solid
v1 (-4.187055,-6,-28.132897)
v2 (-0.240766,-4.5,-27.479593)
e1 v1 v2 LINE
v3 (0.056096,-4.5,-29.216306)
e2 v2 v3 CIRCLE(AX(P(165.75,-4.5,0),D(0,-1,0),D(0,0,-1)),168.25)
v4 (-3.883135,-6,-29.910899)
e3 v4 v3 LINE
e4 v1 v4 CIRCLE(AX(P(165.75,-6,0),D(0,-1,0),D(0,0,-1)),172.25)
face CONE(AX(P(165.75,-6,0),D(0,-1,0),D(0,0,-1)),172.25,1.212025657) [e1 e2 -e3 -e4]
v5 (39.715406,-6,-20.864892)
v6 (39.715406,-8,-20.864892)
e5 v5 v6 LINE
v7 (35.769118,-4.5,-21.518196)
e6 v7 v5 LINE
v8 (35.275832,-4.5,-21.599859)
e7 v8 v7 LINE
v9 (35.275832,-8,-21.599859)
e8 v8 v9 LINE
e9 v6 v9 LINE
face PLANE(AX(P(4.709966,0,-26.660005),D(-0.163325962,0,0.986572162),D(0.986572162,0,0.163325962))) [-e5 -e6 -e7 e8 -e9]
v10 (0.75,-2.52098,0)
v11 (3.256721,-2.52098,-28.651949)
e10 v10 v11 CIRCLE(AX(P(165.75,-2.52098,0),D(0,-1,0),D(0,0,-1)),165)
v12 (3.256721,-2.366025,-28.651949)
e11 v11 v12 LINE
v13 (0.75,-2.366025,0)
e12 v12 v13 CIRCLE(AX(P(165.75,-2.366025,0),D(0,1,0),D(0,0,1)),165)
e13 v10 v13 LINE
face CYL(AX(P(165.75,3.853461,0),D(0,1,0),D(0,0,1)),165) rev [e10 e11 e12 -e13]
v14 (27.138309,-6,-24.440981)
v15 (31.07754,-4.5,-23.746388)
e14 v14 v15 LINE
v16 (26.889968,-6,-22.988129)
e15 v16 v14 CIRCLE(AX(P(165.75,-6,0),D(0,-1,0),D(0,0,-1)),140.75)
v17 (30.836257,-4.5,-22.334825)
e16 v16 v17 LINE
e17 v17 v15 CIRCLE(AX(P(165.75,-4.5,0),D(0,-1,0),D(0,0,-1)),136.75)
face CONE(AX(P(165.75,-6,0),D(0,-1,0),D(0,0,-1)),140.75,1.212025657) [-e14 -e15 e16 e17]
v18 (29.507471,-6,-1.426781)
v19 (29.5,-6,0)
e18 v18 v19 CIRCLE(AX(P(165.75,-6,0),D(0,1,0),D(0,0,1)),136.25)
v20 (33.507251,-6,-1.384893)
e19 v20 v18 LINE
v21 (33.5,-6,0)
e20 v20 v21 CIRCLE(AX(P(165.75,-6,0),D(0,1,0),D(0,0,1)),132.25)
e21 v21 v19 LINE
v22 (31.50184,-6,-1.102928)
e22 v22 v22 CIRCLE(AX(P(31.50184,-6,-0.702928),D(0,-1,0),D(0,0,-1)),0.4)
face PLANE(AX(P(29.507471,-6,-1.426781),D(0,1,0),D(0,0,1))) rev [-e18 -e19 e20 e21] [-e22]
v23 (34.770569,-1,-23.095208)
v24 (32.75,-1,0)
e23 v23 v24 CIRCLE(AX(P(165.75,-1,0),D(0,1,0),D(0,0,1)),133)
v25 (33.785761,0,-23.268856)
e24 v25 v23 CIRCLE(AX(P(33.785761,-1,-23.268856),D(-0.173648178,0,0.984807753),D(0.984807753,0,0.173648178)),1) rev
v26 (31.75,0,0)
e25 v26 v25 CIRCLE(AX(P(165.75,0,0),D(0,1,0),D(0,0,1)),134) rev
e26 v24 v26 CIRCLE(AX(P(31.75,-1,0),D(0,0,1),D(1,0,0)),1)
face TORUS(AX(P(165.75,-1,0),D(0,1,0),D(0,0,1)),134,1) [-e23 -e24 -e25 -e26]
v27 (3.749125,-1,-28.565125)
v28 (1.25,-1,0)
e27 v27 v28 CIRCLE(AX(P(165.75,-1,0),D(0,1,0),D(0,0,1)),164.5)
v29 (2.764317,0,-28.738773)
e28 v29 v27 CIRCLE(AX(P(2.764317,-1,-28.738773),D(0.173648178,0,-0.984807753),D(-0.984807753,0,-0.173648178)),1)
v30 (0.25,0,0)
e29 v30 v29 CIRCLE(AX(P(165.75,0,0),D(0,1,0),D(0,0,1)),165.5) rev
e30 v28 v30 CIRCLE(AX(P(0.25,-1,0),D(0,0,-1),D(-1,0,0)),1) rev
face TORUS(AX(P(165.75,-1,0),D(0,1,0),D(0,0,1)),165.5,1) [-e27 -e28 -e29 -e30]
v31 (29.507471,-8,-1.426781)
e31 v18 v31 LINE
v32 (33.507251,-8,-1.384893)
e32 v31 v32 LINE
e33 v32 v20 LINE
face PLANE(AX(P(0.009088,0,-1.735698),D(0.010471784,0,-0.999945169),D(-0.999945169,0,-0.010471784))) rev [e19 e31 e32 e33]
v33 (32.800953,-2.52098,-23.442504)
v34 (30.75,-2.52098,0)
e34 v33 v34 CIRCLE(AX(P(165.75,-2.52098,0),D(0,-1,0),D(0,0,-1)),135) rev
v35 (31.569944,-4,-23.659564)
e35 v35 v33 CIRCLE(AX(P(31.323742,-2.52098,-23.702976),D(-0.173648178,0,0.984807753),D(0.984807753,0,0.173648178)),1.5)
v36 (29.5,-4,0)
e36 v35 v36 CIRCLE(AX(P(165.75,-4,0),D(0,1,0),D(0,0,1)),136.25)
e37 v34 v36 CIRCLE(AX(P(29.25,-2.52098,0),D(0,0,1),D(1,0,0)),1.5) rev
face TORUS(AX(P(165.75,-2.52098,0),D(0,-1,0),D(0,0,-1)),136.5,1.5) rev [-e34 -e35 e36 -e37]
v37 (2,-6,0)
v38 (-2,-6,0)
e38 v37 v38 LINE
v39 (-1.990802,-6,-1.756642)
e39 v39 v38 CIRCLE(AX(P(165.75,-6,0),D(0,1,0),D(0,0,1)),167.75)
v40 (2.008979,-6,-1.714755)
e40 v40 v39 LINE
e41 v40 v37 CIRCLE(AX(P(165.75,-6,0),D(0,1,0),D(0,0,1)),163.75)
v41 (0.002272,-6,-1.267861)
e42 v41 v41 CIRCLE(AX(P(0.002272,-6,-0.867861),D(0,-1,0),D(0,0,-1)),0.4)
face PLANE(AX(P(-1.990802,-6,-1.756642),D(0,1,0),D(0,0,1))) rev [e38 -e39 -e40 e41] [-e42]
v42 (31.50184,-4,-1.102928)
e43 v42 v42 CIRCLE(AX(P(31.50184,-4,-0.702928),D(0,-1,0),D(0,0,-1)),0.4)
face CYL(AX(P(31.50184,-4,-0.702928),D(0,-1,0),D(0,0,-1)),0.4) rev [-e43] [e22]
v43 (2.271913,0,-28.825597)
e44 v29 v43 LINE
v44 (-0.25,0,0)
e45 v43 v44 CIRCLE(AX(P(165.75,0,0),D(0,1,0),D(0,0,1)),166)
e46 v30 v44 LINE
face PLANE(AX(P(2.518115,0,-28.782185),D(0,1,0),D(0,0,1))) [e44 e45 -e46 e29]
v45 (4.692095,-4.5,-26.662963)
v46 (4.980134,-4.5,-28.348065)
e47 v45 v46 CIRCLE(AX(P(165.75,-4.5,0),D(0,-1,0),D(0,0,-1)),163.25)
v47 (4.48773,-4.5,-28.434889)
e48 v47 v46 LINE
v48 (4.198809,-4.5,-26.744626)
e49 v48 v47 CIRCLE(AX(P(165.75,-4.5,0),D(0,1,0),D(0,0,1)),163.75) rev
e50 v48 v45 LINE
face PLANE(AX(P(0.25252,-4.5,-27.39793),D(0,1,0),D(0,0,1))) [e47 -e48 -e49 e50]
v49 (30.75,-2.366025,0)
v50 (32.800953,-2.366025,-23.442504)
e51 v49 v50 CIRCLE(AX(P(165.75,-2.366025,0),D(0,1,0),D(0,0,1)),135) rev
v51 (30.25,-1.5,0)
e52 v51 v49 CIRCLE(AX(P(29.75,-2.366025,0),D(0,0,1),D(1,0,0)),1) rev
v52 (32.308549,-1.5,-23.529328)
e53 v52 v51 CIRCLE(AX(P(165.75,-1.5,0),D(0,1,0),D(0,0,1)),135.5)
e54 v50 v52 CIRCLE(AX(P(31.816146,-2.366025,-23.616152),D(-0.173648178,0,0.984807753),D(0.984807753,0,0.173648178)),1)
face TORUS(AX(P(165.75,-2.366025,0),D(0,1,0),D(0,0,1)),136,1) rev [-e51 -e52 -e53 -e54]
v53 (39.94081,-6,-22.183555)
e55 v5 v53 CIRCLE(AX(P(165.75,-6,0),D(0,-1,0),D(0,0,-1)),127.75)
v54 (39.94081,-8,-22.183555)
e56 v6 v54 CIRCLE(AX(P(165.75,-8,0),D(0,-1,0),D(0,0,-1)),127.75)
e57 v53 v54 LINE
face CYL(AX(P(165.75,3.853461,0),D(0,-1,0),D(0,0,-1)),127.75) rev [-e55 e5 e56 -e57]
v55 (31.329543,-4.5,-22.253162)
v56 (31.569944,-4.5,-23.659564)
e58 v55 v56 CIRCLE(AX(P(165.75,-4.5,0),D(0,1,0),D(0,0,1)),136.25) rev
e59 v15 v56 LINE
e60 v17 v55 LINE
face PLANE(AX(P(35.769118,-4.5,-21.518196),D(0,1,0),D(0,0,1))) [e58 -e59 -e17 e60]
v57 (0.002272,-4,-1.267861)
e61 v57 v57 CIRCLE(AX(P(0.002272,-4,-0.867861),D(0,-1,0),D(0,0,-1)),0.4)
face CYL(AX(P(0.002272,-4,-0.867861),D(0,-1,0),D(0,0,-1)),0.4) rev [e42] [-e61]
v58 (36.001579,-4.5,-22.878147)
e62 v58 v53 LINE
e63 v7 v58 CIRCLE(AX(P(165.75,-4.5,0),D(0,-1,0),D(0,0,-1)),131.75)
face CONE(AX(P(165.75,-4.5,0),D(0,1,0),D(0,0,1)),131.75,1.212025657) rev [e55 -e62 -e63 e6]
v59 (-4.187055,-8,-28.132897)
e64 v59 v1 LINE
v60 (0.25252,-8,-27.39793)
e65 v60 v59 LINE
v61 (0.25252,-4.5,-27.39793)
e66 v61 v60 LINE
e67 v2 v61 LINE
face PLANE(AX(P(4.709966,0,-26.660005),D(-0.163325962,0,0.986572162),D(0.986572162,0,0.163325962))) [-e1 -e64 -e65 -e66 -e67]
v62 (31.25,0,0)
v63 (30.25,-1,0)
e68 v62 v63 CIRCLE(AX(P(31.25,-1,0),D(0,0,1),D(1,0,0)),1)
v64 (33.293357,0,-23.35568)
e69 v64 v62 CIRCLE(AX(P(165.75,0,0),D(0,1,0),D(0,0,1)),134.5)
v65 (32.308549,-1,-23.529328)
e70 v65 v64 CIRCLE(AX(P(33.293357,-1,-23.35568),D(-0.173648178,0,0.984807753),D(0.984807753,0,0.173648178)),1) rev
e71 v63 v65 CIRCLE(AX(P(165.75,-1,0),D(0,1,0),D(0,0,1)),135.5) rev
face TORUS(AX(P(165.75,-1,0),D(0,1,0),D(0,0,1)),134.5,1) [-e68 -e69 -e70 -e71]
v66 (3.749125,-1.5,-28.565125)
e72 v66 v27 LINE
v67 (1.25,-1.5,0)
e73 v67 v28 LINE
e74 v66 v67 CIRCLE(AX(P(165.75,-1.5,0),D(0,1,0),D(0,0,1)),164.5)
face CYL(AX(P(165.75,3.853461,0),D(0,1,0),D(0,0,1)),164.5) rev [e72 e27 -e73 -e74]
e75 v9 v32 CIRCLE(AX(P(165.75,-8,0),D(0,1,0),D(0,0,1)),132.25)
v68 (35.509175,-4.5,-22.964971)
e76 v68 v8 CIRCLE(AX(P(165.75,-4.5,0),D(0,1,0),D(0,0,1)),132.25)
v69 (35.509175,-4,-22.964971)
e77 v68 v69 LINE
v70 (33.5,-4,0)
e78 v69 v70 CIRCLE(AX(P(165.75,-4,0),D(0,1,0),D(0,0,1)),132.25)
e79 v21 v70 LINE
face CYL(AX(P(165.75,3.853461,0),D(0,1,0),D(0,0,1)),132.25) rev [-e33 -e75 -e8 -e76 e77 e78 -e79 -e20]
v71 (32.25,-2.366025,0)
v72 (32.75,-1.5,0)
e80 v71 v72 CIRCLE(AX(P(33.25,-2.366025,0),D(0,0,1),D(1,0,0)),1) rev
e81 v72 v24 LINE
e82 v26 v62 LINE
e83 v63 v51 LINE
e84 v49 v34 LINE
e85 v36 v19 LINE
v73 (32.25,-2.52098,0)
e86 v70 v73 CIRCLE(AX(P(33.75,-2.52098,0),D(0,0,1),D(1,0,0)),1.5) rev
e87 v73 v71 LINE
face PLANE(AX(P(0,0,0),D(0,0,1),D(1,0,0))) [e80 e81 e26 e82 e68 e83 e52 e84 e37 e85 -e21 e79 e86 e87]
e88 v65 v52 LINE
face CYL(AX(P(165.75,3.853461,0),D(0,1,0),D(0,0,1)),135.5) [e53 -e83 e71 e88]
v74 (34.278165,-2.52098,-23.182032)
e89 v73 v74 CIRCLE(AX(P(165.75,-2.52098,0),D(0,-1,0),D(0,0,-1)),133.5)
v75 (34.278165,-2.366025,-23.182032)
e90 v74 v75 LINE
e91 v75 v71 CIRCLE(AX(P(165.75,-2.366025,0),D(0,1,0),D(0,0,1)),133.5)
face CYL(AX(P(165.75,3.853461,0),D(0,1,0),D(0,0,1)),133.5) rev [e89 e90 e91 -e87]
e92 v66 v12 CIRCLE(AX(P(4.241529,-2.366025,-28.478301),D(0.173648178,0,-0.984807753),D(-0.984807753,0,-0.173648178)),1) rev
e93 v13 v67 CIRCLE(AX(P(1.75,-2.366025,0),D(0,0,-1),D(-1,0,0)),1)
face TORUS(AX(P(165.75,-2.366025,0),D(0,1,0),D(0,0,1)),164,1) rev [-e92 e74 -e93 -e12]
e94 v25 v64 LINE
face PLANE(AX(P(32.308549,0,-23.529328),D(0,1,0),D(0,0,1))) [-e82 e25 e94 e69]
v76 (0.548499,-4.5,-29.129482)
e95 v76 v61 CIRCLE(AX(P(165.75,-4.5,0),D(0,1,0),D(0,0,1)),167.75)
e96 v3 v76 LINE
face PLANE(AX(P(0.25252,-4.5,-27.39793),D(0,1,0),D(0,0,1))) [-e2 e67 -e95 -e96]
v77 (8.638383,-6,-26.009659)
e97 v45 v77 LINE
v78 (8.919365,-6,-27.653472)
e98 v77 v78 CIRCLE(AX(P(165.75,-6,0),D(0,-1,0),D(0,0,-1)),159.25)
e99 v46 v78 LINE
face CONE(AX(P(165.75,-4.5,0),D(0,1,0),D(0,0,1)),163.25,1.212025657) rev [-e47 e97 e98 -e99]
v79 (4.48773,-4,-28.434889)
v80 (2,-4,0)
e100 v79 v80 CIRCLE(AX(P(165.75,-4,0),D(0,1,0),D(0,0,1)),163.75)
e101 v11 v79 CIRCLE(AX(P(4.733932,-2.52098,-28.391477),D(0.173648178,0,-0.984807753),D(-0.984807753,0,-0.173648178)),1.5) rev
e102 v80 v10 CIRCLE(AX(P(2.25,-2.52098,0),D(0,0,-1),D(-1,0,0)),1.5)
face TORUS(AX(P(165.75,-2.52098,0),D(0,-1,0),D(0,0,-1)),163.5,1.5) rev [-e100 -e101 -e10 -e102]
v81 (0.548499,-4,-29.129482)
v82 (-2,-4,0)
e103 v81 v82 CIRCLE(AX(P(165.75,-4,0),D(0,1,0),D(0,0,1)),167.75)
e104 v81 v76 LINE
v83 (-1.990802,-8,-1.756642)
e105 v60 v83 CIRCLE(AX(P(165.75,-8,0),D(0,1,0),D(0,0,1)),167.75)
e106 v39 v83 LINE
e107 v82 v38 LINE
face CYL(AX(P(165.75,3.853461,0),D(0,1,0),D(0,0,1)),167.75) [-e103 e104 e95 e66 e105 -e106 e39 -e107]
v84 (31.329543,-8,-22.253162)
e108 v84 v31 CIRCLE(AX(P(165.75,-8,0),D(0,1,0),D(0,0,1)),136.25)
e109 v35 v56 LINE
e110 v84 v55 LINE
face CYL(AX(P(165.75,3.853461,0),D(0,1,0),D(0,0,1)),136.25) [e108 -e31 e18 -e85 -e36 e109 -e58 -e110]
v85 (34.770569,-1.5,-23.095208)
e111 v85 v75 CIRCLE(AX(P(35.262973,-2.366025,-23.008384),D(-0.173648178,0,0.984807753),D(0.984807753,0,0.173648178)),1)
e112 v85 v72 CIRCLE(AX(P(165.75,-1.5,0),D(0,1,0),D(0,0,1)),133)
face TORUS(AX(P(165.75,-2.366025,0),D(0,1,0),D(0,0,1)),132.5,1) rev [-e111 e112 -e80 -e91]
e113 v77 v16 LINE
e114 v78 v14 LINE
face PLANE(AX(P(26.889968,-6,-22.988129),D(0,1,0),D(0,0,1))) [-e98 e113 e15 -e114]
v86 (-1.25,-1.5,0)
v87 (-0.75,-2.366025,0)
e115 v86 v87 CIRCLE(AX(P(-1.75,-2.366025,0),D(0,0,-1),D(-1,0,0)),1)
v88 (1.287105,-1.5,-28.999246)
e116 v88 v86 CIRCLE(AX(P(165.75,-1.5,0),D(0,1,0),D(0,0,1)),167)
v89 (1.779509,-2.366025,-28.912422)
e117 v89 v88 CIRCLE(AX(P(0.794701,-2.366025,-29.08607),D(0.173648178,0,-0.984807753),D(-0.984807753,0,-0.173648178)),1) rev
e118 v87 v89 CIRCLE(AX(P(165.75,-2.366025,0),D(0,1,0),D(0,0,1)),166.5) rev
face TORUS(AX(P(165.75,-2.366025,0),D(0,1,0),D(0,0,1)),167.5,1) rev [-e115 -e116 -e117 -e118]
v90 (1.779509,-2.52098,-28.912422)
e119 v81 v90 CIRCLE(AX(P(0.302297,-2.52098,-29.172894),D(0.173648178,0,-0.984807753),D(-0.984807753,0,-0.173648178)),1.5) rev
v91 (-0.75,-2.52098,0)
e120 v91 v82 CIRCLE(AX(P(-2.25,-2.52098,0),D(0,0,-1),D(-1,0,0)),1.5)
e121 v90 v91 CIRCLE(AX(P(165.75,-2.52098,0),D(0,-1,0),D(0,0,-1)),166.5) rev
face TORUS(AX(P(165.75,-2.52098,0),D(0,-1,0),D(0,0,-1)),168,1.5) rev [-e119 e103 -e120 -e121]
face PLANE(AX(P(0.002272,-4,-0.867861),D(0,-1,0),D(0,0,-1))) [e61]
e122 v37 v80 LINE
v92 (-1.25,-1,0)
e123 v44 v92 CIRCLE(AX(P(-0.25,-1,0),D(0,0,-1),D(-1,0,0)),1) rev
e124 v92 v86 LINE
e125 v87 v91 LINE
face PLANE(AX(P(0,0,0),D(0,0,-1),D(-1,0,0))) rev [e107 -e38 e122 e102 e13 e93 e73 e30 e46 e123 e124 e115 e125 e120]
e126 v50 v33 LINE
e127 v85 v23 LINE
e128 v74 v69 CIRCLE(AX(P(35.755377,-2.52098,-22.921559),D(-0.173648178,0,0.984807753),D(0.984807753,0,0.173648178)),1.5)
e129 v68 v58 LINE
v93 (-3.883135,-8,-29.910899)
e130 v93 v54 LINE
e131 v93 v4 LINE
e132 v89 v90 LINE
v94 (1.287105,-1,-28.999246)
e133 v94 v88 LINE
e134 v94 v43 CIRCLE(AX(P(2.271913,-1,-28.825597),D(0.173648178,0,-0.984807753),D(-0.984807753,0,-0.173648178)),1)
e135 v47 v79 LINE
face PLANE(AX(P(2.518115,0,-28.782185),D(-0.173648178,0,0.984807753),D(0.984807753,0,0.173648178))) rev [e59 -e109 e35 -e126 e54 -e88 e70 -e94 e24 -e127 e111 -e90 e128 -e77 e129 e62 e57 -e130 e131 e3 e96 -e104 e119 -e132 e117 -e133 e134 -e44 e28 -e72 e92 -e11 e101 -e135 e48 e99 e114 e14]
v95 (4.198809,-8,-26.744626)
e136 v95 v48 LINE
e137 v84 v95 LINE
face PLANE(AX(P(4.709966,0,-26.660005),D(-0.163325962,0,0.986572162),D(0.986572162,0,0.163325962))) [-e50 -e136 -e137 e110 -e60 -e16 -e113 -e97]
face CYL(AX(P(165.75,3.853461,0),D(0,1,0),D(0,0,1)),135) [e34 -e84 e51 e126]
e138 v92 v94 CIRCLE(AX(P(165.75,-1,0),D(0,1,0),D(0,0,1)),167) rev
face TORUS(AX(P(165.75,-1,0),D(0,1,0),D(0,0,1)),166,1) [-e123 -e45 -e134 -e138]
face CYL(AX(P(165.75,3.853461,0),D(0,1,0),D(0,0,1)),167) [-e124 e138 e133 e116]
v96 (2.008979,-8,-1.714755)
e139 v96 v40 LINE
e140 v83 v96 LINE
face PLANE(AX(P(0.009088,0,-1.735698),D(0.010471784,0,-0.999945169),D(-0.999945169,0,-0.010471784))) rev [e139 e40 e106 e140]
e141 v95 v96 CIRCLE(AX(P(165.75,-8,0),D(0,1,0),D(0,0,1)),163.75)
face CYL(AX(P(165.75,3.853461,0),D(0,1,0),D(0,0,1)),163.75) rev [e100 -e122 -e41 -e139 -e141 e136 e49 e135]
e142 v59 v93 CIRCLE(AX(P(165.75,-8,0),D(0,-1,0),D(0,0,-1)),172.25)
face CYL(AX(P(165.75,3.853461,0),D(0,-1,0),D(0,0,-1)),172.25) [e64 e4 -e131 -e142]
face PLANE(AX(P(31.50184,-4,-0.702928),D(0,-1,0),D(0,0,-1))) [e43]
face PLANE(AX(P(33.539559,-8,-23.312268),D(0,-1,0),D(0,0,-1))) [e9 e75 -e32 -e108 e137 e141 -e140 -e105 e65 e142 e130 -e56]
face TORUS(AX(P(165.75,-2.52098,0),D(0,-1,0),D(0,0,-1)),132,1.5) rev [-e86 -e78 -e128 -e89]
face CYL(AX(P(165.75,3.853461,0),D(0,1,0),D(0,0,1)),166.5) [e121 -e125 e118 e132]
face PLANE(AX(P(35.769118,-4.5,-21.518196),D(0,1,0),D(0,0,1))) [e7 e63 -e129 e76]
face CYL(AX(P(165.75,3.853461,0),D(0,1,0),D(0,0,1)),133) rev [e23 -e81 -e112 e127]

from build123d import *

# Parameters (mm, degrees)
REVOLVE_1_ANGLE     = 10
FILLET_1_R          = 1.5
FILLET_2_R          = 1.5
FILLET_3_R          = 1
FILLET_4_R          = 1
SKETCH_7_W          = 4
SKETCH_7_H          = 2
CUT_REVOLVE_1_ANGLE = 0.6
SKETCH_10_R         = 0.4
CUT_EXTRUDE_1_DEPTH = 2
REVOLVE_2_ANGLE     = 0.6


with BuildPart() as part:
    # 草图4 → 旋转1 (revolve)
    with BuildSketch(Plane.XY):
        Polygon((0.75, -1.5), (1.25, -1.5), (1.25, 0), (0, 0), (-1.25, 0), (-1.25, -1.5), (-0.75, -1.5), (-0.75, -4), (-2, -4), (-2, -8), (0, -8), (2, -8), (2, -4), (0.75, -4), align=None)
        Polygon((31.5, 0), (32.75, 0), (32.75, -1.5), (32.25, -1.5), (32.25, -4), (33.5, -4), (33.5, -8), (31.5, -8), (29.5, -8), (29.5, -4), (30.75, -4), (30.75, -1.5), (30.25, -1.5), (30.25, 0), align=None)
    revolve(axis=Axis((165.75, 3.853460973, 0), (0, -1, 0)), revolution_arc=REVOLVE_1_ANGLE)

    # 圆角1
    # the kernel refuses this fillet: 1.5 mm, written as the material it adds along each edge
    with BuildSketch(Plane(origin=(165.75, -4, 0), x_dir=(-1, 0, 0), z_dir=(0, 0, 1))) as fillet_1_piece_1:
        with BuildLine():
            CenterArc((163.5, -1.479019946), FILLET_1_R, 0, 80.405931773)
            Line((165, -1.479019946), (165.03, -1.479019946))
            Line((165.03, -1.479019946), (165.03, 0))
            Line((165.03, 0), (165, 0.03))
            ThreePointArc((165, 0.03), (164.375, 0.03), (163.755, 0.029580399))
            Line((163.755, 0.029580399), (163.75, 0))
        make_face()
    revolve(axis=Axis((165.75, -4, 0), (0, -1, 0)), revolution_arc=10)
    with BuildSketch(Plane(origin=(165.75, -4, 0), x_dir=(-1, 0, 0), z_dir=(0, 0, 1))) as fillet_1_piece_2:
        with BuildLine():
            CenterArc((168, -1.479019946), FILLET_1_R, 99.594068227, 80.405931773)
            Line((166.5, -1.479019946), (166.47, -1.479019946))
            Line((166.47, -1.479019946), (166.47, 0))
            Line((166.47, 0), (166.5, 0.03))
            ThreePointArc((166.5, 0.03), (167.125, 0.03), (167.745, 0.029580399))
            Line((167.745, 0.029580399), (167.75, 0))
        make_face()
    revolve(axis=Axis((165.75, -4, 0), (0, -1, 0)), revolution_arc=10)

    # 圆角2
    # the kernel refuses this fillet: 1.5 mm, written as the material it adds along each edge
    with BuildSketch(Plane(origin=(165.75, -4, 0), x_dir=(-1, 0, 0), z_dir=(0, 0, 1))) as fillet_2_piece_1:
        with BuildLine():
            CenterArc((136.5, -1.479019946), FILLET_2_R, 99.594068227, 80.405931773)
            Line((136.25, 0), (136.245, 0.029580399))
            ThreePointArc((136.245, 0.029580399), (135.625, 0.03), (135, 0.03))
            Line((135, 0.03), (134.97, 0))
            Line((134.97, 0), (134.97, -1.479019946))
            Line((134.97, -1.479019946), (135, -1.479019946))
        make_face()
    revolve(axis=Axis((165.75, -4, 0), (0, -1, 0)), revolution_arc=10)
    with BuildSketch(Plane(origin=(165.75, -4, 0), x_dir=(-1, 0, 0), z_dir=(0, 0, 1))) as fillet_2_piece_2:
        with BuildLine():
            CenterArc((132, -1.479019946), FILLET_2_R, 0, 80.405931773)
            Line((133.5, -1.479019946), (133.53, -1.479019946))
            Line((133.53, -1.479019946), (133.53, 0))
            Line((133.53, 0), (133.5, 0.03))
            ThreePointArc((133.5, 0.03), (132.875, 0.03), (132.255, 0.029580399))
            Line((132.255, 0.029580399), (132.25, 0))
        make_face()
    revolve(axis=Axis((165.75, -4, 0), (0, -1, 0)), revolution_arc=10)

    # 圆角3
    # the kernel refuses this fillet: 1 mm, written as the material it adds along each edge
    with BuildSketch(Plane(origin=(165.75, -1.5, 0), x_dir=(-1, 0, 0), z_dir=(0, 0, 1))) as fillet_3_piece_1:
        with BuildLine():
            CenterArc((136, 0.866025404), FILLET_3_R, 180, 60)
            Line((135, 0.866025404), (135, 0))
            Line((135, 0), (135.5, 0))
        make_face()
    revolve(axis=Axis((165.75, -1.5, 0), (0, -1, 0)), revolution_arc=10)
    with BuildSketch(Plane(origin=(165.75, -1.5, 0), x_dir=(-1, 0, 0), z_dir=(0, 0, 1))) as fillet_3_piece_2:
        with BuildLine():
            CenterArc((132.5, 0.866025404), FILLET_3_R, 300, 60)
            Line((133, 0), (133.5, 0))
            Line((133.5, 0), (133.5, 0.866025404))
        make_face()
    revolve(axis=Axis((165.75, -1.5, 0), (0, -1, 0)), revolution_arc=10)
    # the kernel refuses this fillet: 1 mm, written as the material it takes off along each edge
    with BuildSketch(Plane(origin=(165.75, 0, 0), x_dir=(-0.9998233399867428, 0, 0.018795978765534377), z_dir=(0.018795978765534377, 0, 0.9998233399867428))) as fillet_3_2_piece_1:
        with BuildLine():
            CenterArc((133 + FILLET_3_R, FILLET_3_R), FILLET_3_R, 180, 90)
            Line((133, FILLET_3_R), (133, 0))
            Line((133, 0), (133 + FILLET_3_R, 0))
        make_face()
    revolve(axis=Axis((165.75, 0, 0), (0, -1, 0)), revolution_arc=12.153987353, mode=Mode.SUBTRACT)
    with BuildSketch(Plane(origin=(165.75, 0, 0), x_dir=(-0.9998297984864879, 0, 0.01844922921070363), z_dir=(0.01844922921070363, 0, 0.9998297984864879))) as fillet_3_2_piece_2:
        with BuildLine():
            CenterArc((135.5 - FILLET_3_R, FILLET_3_R), FILLET_3_R, 270, 90)
            Line((135.5 - FILLET_3_R, 0), (135.5, 0))
            Line((135.5, 0), (135.5, FILLET_3_R))
        make_face()
    revolve(axis=Axis((165.75, 0, 0), (0, -1, 0)), revolution_arc=12.114245889, mode=Mode.SUBTRACT)

    # 圆角4
    # the kernel refuses this fillet: 1 mm, written as the material it adds along each edge
    with BuildSketch(Plane(origin=(165.75, -1.5, 0), x_dir=(-1, 0, 0), z_dir=(0, 0, 1))) as fillet_4_piece_1:
        with BuildLine():
            CenterArc((167.5, 0.866025404), FILLET_4_R, 180, 60)
            Line((167, 0), (166.5, 0))
            Line((166.5, 0), (166.5, 0.866025404))
        make_face()
    revolve(axis=Axis((165.75, -1.5, 0), (0, -1, 0)), revolution_arc=10)
    with BuildSketch(Plane(origin=(165.75, -1.5, 0), x_dir=(-1, 0, 0), z_dir=(0, 0, 1))) as fillet_4_piece_2:
        with BuildLine():
            CenterArc((164, 0.866025404), FILLET_4_R, 300, 60)
            Line((164.5, 0), (165, 0))
            Line((165, 0), (165, 0.866025404))
        make_face()
    revolve(axis=Axis((165.75, -1.5, 0), (0, -1, 0)), revolution_arc=10)
    # the kernel refuses this fillet: 1 mm, written as the material it takes off along each edge
    with BuildSketch(Plane(origin=(165.75, 0, 0), x_dir=(-0.9998845180351503, 0, 0.015197058715919934), z_dir=(0.015197058715919934, 0, 0.9998845180351503))) as fillet_4_2_piece_1:
        with BuildLine():
            CenterArc((164.5 + FILLET_4_R, FILLET_4_R), FILLET_4_R, 180, 90)
            Line((164.5, FILLET_4_R), (164.5, 0))
            Line((164.5, 0), (164.5 + FILLET_4_R, 0))
        make_face()
    revolve(axis=Axis((165.75, 0, 0), (0, -1, 0)), revolution_arc=11.74152169, mode=Mode.SUBTRACT)
    with BuildSketch(Plane(origin=(165.75, 0, 0), x_dir=(-0.9998879496351009, 0, 0.014969574961036002), z_dir=(0.014969574961036002, 0, 0.9998879496351009))) as fillet_4_2_piece_2:
        with BuildLine():
            CenterArc((167 - FILLET_4_R, FILLET_4_R), FILLET_4_R, 270, 90)
            Line((167 - FILLET_4_R, 0), (167, 0))
            Line((167, 0), (167, FILLET_4_R))
        make_face()
    revolve(axis=Axis((165.75, 0, 0), (0, -1, 0)), revolution_arc=11.715451006, mode=Mode.SUBTRACT)

    # 草图7 → 切除-旋转1 (revolve, cut)
    with BuildSketch(Plane.XY):
        with Locations((0, -7)):
            Rectangle(SKETCH_7_W, SKETCH_7_H)
        with Locations((31.5, -7)):
            Rectangle(SKETCH_7_W, SKETCH_7_H)
    revolve(axis=Axis((165.75, 3.853460973, 0), (0, -1, 0)), revolution_arc=CUT_REVOLVE_1_ANGLE, mode=Mode.SUBTRACT)

    # 草图10 → 切除-拉伸1 (cut)
    with BuildSketch(Plane.XZ.offset(6)):
        with Locations(Location((0.00227206, -0.867861005, 0), (0, 0, 270))):
            Circle(SKETCH_10_R)
        with Locations(Location((31.501840266, -0.702928144, 0), (0, 0, 270))):
            Circle(SKETCH_10_R)
    extrude(amount=-CUT_EXTRUDE_1_DEPTH, mode=Mode.SUBTRACT)

    # 草图11 → 旋转2 (revolve)
    with BuildSketch(Plane(origin=(4.997974052, 0, -28.344919378), x_dir=(-0.9848077530122081, 0, -0.17364817766693072), z_dir=(0.17364817766693072, 0, -0.9848077530122081))):
        Polygon((-26.981885062, -4.5), (-26.481885062, -4.5), (-22.481885062, -6), (-3.981885062, -6), (0.018114938, -4.5), (0.518114938, -4.5), (4.518114938, -4.5), (5.018114938, -4.5), (9.018114938, -6), (9.018114938, -8), (4.518114938, -8), (0.518114938, -8), (-26.981885062, -8), (-30.981885062, -8), (-35.481885062, -8), (-35.481885062, -6), (-31.481885062, -4.5), (-30.981885062, -4.5), align=None)
    revolve(axis=Axis((165.75, 3.853460973, 0), (0, 1, 0)), revolution_arc=REVOLVE_2_ANGLE)


solid = part.part
